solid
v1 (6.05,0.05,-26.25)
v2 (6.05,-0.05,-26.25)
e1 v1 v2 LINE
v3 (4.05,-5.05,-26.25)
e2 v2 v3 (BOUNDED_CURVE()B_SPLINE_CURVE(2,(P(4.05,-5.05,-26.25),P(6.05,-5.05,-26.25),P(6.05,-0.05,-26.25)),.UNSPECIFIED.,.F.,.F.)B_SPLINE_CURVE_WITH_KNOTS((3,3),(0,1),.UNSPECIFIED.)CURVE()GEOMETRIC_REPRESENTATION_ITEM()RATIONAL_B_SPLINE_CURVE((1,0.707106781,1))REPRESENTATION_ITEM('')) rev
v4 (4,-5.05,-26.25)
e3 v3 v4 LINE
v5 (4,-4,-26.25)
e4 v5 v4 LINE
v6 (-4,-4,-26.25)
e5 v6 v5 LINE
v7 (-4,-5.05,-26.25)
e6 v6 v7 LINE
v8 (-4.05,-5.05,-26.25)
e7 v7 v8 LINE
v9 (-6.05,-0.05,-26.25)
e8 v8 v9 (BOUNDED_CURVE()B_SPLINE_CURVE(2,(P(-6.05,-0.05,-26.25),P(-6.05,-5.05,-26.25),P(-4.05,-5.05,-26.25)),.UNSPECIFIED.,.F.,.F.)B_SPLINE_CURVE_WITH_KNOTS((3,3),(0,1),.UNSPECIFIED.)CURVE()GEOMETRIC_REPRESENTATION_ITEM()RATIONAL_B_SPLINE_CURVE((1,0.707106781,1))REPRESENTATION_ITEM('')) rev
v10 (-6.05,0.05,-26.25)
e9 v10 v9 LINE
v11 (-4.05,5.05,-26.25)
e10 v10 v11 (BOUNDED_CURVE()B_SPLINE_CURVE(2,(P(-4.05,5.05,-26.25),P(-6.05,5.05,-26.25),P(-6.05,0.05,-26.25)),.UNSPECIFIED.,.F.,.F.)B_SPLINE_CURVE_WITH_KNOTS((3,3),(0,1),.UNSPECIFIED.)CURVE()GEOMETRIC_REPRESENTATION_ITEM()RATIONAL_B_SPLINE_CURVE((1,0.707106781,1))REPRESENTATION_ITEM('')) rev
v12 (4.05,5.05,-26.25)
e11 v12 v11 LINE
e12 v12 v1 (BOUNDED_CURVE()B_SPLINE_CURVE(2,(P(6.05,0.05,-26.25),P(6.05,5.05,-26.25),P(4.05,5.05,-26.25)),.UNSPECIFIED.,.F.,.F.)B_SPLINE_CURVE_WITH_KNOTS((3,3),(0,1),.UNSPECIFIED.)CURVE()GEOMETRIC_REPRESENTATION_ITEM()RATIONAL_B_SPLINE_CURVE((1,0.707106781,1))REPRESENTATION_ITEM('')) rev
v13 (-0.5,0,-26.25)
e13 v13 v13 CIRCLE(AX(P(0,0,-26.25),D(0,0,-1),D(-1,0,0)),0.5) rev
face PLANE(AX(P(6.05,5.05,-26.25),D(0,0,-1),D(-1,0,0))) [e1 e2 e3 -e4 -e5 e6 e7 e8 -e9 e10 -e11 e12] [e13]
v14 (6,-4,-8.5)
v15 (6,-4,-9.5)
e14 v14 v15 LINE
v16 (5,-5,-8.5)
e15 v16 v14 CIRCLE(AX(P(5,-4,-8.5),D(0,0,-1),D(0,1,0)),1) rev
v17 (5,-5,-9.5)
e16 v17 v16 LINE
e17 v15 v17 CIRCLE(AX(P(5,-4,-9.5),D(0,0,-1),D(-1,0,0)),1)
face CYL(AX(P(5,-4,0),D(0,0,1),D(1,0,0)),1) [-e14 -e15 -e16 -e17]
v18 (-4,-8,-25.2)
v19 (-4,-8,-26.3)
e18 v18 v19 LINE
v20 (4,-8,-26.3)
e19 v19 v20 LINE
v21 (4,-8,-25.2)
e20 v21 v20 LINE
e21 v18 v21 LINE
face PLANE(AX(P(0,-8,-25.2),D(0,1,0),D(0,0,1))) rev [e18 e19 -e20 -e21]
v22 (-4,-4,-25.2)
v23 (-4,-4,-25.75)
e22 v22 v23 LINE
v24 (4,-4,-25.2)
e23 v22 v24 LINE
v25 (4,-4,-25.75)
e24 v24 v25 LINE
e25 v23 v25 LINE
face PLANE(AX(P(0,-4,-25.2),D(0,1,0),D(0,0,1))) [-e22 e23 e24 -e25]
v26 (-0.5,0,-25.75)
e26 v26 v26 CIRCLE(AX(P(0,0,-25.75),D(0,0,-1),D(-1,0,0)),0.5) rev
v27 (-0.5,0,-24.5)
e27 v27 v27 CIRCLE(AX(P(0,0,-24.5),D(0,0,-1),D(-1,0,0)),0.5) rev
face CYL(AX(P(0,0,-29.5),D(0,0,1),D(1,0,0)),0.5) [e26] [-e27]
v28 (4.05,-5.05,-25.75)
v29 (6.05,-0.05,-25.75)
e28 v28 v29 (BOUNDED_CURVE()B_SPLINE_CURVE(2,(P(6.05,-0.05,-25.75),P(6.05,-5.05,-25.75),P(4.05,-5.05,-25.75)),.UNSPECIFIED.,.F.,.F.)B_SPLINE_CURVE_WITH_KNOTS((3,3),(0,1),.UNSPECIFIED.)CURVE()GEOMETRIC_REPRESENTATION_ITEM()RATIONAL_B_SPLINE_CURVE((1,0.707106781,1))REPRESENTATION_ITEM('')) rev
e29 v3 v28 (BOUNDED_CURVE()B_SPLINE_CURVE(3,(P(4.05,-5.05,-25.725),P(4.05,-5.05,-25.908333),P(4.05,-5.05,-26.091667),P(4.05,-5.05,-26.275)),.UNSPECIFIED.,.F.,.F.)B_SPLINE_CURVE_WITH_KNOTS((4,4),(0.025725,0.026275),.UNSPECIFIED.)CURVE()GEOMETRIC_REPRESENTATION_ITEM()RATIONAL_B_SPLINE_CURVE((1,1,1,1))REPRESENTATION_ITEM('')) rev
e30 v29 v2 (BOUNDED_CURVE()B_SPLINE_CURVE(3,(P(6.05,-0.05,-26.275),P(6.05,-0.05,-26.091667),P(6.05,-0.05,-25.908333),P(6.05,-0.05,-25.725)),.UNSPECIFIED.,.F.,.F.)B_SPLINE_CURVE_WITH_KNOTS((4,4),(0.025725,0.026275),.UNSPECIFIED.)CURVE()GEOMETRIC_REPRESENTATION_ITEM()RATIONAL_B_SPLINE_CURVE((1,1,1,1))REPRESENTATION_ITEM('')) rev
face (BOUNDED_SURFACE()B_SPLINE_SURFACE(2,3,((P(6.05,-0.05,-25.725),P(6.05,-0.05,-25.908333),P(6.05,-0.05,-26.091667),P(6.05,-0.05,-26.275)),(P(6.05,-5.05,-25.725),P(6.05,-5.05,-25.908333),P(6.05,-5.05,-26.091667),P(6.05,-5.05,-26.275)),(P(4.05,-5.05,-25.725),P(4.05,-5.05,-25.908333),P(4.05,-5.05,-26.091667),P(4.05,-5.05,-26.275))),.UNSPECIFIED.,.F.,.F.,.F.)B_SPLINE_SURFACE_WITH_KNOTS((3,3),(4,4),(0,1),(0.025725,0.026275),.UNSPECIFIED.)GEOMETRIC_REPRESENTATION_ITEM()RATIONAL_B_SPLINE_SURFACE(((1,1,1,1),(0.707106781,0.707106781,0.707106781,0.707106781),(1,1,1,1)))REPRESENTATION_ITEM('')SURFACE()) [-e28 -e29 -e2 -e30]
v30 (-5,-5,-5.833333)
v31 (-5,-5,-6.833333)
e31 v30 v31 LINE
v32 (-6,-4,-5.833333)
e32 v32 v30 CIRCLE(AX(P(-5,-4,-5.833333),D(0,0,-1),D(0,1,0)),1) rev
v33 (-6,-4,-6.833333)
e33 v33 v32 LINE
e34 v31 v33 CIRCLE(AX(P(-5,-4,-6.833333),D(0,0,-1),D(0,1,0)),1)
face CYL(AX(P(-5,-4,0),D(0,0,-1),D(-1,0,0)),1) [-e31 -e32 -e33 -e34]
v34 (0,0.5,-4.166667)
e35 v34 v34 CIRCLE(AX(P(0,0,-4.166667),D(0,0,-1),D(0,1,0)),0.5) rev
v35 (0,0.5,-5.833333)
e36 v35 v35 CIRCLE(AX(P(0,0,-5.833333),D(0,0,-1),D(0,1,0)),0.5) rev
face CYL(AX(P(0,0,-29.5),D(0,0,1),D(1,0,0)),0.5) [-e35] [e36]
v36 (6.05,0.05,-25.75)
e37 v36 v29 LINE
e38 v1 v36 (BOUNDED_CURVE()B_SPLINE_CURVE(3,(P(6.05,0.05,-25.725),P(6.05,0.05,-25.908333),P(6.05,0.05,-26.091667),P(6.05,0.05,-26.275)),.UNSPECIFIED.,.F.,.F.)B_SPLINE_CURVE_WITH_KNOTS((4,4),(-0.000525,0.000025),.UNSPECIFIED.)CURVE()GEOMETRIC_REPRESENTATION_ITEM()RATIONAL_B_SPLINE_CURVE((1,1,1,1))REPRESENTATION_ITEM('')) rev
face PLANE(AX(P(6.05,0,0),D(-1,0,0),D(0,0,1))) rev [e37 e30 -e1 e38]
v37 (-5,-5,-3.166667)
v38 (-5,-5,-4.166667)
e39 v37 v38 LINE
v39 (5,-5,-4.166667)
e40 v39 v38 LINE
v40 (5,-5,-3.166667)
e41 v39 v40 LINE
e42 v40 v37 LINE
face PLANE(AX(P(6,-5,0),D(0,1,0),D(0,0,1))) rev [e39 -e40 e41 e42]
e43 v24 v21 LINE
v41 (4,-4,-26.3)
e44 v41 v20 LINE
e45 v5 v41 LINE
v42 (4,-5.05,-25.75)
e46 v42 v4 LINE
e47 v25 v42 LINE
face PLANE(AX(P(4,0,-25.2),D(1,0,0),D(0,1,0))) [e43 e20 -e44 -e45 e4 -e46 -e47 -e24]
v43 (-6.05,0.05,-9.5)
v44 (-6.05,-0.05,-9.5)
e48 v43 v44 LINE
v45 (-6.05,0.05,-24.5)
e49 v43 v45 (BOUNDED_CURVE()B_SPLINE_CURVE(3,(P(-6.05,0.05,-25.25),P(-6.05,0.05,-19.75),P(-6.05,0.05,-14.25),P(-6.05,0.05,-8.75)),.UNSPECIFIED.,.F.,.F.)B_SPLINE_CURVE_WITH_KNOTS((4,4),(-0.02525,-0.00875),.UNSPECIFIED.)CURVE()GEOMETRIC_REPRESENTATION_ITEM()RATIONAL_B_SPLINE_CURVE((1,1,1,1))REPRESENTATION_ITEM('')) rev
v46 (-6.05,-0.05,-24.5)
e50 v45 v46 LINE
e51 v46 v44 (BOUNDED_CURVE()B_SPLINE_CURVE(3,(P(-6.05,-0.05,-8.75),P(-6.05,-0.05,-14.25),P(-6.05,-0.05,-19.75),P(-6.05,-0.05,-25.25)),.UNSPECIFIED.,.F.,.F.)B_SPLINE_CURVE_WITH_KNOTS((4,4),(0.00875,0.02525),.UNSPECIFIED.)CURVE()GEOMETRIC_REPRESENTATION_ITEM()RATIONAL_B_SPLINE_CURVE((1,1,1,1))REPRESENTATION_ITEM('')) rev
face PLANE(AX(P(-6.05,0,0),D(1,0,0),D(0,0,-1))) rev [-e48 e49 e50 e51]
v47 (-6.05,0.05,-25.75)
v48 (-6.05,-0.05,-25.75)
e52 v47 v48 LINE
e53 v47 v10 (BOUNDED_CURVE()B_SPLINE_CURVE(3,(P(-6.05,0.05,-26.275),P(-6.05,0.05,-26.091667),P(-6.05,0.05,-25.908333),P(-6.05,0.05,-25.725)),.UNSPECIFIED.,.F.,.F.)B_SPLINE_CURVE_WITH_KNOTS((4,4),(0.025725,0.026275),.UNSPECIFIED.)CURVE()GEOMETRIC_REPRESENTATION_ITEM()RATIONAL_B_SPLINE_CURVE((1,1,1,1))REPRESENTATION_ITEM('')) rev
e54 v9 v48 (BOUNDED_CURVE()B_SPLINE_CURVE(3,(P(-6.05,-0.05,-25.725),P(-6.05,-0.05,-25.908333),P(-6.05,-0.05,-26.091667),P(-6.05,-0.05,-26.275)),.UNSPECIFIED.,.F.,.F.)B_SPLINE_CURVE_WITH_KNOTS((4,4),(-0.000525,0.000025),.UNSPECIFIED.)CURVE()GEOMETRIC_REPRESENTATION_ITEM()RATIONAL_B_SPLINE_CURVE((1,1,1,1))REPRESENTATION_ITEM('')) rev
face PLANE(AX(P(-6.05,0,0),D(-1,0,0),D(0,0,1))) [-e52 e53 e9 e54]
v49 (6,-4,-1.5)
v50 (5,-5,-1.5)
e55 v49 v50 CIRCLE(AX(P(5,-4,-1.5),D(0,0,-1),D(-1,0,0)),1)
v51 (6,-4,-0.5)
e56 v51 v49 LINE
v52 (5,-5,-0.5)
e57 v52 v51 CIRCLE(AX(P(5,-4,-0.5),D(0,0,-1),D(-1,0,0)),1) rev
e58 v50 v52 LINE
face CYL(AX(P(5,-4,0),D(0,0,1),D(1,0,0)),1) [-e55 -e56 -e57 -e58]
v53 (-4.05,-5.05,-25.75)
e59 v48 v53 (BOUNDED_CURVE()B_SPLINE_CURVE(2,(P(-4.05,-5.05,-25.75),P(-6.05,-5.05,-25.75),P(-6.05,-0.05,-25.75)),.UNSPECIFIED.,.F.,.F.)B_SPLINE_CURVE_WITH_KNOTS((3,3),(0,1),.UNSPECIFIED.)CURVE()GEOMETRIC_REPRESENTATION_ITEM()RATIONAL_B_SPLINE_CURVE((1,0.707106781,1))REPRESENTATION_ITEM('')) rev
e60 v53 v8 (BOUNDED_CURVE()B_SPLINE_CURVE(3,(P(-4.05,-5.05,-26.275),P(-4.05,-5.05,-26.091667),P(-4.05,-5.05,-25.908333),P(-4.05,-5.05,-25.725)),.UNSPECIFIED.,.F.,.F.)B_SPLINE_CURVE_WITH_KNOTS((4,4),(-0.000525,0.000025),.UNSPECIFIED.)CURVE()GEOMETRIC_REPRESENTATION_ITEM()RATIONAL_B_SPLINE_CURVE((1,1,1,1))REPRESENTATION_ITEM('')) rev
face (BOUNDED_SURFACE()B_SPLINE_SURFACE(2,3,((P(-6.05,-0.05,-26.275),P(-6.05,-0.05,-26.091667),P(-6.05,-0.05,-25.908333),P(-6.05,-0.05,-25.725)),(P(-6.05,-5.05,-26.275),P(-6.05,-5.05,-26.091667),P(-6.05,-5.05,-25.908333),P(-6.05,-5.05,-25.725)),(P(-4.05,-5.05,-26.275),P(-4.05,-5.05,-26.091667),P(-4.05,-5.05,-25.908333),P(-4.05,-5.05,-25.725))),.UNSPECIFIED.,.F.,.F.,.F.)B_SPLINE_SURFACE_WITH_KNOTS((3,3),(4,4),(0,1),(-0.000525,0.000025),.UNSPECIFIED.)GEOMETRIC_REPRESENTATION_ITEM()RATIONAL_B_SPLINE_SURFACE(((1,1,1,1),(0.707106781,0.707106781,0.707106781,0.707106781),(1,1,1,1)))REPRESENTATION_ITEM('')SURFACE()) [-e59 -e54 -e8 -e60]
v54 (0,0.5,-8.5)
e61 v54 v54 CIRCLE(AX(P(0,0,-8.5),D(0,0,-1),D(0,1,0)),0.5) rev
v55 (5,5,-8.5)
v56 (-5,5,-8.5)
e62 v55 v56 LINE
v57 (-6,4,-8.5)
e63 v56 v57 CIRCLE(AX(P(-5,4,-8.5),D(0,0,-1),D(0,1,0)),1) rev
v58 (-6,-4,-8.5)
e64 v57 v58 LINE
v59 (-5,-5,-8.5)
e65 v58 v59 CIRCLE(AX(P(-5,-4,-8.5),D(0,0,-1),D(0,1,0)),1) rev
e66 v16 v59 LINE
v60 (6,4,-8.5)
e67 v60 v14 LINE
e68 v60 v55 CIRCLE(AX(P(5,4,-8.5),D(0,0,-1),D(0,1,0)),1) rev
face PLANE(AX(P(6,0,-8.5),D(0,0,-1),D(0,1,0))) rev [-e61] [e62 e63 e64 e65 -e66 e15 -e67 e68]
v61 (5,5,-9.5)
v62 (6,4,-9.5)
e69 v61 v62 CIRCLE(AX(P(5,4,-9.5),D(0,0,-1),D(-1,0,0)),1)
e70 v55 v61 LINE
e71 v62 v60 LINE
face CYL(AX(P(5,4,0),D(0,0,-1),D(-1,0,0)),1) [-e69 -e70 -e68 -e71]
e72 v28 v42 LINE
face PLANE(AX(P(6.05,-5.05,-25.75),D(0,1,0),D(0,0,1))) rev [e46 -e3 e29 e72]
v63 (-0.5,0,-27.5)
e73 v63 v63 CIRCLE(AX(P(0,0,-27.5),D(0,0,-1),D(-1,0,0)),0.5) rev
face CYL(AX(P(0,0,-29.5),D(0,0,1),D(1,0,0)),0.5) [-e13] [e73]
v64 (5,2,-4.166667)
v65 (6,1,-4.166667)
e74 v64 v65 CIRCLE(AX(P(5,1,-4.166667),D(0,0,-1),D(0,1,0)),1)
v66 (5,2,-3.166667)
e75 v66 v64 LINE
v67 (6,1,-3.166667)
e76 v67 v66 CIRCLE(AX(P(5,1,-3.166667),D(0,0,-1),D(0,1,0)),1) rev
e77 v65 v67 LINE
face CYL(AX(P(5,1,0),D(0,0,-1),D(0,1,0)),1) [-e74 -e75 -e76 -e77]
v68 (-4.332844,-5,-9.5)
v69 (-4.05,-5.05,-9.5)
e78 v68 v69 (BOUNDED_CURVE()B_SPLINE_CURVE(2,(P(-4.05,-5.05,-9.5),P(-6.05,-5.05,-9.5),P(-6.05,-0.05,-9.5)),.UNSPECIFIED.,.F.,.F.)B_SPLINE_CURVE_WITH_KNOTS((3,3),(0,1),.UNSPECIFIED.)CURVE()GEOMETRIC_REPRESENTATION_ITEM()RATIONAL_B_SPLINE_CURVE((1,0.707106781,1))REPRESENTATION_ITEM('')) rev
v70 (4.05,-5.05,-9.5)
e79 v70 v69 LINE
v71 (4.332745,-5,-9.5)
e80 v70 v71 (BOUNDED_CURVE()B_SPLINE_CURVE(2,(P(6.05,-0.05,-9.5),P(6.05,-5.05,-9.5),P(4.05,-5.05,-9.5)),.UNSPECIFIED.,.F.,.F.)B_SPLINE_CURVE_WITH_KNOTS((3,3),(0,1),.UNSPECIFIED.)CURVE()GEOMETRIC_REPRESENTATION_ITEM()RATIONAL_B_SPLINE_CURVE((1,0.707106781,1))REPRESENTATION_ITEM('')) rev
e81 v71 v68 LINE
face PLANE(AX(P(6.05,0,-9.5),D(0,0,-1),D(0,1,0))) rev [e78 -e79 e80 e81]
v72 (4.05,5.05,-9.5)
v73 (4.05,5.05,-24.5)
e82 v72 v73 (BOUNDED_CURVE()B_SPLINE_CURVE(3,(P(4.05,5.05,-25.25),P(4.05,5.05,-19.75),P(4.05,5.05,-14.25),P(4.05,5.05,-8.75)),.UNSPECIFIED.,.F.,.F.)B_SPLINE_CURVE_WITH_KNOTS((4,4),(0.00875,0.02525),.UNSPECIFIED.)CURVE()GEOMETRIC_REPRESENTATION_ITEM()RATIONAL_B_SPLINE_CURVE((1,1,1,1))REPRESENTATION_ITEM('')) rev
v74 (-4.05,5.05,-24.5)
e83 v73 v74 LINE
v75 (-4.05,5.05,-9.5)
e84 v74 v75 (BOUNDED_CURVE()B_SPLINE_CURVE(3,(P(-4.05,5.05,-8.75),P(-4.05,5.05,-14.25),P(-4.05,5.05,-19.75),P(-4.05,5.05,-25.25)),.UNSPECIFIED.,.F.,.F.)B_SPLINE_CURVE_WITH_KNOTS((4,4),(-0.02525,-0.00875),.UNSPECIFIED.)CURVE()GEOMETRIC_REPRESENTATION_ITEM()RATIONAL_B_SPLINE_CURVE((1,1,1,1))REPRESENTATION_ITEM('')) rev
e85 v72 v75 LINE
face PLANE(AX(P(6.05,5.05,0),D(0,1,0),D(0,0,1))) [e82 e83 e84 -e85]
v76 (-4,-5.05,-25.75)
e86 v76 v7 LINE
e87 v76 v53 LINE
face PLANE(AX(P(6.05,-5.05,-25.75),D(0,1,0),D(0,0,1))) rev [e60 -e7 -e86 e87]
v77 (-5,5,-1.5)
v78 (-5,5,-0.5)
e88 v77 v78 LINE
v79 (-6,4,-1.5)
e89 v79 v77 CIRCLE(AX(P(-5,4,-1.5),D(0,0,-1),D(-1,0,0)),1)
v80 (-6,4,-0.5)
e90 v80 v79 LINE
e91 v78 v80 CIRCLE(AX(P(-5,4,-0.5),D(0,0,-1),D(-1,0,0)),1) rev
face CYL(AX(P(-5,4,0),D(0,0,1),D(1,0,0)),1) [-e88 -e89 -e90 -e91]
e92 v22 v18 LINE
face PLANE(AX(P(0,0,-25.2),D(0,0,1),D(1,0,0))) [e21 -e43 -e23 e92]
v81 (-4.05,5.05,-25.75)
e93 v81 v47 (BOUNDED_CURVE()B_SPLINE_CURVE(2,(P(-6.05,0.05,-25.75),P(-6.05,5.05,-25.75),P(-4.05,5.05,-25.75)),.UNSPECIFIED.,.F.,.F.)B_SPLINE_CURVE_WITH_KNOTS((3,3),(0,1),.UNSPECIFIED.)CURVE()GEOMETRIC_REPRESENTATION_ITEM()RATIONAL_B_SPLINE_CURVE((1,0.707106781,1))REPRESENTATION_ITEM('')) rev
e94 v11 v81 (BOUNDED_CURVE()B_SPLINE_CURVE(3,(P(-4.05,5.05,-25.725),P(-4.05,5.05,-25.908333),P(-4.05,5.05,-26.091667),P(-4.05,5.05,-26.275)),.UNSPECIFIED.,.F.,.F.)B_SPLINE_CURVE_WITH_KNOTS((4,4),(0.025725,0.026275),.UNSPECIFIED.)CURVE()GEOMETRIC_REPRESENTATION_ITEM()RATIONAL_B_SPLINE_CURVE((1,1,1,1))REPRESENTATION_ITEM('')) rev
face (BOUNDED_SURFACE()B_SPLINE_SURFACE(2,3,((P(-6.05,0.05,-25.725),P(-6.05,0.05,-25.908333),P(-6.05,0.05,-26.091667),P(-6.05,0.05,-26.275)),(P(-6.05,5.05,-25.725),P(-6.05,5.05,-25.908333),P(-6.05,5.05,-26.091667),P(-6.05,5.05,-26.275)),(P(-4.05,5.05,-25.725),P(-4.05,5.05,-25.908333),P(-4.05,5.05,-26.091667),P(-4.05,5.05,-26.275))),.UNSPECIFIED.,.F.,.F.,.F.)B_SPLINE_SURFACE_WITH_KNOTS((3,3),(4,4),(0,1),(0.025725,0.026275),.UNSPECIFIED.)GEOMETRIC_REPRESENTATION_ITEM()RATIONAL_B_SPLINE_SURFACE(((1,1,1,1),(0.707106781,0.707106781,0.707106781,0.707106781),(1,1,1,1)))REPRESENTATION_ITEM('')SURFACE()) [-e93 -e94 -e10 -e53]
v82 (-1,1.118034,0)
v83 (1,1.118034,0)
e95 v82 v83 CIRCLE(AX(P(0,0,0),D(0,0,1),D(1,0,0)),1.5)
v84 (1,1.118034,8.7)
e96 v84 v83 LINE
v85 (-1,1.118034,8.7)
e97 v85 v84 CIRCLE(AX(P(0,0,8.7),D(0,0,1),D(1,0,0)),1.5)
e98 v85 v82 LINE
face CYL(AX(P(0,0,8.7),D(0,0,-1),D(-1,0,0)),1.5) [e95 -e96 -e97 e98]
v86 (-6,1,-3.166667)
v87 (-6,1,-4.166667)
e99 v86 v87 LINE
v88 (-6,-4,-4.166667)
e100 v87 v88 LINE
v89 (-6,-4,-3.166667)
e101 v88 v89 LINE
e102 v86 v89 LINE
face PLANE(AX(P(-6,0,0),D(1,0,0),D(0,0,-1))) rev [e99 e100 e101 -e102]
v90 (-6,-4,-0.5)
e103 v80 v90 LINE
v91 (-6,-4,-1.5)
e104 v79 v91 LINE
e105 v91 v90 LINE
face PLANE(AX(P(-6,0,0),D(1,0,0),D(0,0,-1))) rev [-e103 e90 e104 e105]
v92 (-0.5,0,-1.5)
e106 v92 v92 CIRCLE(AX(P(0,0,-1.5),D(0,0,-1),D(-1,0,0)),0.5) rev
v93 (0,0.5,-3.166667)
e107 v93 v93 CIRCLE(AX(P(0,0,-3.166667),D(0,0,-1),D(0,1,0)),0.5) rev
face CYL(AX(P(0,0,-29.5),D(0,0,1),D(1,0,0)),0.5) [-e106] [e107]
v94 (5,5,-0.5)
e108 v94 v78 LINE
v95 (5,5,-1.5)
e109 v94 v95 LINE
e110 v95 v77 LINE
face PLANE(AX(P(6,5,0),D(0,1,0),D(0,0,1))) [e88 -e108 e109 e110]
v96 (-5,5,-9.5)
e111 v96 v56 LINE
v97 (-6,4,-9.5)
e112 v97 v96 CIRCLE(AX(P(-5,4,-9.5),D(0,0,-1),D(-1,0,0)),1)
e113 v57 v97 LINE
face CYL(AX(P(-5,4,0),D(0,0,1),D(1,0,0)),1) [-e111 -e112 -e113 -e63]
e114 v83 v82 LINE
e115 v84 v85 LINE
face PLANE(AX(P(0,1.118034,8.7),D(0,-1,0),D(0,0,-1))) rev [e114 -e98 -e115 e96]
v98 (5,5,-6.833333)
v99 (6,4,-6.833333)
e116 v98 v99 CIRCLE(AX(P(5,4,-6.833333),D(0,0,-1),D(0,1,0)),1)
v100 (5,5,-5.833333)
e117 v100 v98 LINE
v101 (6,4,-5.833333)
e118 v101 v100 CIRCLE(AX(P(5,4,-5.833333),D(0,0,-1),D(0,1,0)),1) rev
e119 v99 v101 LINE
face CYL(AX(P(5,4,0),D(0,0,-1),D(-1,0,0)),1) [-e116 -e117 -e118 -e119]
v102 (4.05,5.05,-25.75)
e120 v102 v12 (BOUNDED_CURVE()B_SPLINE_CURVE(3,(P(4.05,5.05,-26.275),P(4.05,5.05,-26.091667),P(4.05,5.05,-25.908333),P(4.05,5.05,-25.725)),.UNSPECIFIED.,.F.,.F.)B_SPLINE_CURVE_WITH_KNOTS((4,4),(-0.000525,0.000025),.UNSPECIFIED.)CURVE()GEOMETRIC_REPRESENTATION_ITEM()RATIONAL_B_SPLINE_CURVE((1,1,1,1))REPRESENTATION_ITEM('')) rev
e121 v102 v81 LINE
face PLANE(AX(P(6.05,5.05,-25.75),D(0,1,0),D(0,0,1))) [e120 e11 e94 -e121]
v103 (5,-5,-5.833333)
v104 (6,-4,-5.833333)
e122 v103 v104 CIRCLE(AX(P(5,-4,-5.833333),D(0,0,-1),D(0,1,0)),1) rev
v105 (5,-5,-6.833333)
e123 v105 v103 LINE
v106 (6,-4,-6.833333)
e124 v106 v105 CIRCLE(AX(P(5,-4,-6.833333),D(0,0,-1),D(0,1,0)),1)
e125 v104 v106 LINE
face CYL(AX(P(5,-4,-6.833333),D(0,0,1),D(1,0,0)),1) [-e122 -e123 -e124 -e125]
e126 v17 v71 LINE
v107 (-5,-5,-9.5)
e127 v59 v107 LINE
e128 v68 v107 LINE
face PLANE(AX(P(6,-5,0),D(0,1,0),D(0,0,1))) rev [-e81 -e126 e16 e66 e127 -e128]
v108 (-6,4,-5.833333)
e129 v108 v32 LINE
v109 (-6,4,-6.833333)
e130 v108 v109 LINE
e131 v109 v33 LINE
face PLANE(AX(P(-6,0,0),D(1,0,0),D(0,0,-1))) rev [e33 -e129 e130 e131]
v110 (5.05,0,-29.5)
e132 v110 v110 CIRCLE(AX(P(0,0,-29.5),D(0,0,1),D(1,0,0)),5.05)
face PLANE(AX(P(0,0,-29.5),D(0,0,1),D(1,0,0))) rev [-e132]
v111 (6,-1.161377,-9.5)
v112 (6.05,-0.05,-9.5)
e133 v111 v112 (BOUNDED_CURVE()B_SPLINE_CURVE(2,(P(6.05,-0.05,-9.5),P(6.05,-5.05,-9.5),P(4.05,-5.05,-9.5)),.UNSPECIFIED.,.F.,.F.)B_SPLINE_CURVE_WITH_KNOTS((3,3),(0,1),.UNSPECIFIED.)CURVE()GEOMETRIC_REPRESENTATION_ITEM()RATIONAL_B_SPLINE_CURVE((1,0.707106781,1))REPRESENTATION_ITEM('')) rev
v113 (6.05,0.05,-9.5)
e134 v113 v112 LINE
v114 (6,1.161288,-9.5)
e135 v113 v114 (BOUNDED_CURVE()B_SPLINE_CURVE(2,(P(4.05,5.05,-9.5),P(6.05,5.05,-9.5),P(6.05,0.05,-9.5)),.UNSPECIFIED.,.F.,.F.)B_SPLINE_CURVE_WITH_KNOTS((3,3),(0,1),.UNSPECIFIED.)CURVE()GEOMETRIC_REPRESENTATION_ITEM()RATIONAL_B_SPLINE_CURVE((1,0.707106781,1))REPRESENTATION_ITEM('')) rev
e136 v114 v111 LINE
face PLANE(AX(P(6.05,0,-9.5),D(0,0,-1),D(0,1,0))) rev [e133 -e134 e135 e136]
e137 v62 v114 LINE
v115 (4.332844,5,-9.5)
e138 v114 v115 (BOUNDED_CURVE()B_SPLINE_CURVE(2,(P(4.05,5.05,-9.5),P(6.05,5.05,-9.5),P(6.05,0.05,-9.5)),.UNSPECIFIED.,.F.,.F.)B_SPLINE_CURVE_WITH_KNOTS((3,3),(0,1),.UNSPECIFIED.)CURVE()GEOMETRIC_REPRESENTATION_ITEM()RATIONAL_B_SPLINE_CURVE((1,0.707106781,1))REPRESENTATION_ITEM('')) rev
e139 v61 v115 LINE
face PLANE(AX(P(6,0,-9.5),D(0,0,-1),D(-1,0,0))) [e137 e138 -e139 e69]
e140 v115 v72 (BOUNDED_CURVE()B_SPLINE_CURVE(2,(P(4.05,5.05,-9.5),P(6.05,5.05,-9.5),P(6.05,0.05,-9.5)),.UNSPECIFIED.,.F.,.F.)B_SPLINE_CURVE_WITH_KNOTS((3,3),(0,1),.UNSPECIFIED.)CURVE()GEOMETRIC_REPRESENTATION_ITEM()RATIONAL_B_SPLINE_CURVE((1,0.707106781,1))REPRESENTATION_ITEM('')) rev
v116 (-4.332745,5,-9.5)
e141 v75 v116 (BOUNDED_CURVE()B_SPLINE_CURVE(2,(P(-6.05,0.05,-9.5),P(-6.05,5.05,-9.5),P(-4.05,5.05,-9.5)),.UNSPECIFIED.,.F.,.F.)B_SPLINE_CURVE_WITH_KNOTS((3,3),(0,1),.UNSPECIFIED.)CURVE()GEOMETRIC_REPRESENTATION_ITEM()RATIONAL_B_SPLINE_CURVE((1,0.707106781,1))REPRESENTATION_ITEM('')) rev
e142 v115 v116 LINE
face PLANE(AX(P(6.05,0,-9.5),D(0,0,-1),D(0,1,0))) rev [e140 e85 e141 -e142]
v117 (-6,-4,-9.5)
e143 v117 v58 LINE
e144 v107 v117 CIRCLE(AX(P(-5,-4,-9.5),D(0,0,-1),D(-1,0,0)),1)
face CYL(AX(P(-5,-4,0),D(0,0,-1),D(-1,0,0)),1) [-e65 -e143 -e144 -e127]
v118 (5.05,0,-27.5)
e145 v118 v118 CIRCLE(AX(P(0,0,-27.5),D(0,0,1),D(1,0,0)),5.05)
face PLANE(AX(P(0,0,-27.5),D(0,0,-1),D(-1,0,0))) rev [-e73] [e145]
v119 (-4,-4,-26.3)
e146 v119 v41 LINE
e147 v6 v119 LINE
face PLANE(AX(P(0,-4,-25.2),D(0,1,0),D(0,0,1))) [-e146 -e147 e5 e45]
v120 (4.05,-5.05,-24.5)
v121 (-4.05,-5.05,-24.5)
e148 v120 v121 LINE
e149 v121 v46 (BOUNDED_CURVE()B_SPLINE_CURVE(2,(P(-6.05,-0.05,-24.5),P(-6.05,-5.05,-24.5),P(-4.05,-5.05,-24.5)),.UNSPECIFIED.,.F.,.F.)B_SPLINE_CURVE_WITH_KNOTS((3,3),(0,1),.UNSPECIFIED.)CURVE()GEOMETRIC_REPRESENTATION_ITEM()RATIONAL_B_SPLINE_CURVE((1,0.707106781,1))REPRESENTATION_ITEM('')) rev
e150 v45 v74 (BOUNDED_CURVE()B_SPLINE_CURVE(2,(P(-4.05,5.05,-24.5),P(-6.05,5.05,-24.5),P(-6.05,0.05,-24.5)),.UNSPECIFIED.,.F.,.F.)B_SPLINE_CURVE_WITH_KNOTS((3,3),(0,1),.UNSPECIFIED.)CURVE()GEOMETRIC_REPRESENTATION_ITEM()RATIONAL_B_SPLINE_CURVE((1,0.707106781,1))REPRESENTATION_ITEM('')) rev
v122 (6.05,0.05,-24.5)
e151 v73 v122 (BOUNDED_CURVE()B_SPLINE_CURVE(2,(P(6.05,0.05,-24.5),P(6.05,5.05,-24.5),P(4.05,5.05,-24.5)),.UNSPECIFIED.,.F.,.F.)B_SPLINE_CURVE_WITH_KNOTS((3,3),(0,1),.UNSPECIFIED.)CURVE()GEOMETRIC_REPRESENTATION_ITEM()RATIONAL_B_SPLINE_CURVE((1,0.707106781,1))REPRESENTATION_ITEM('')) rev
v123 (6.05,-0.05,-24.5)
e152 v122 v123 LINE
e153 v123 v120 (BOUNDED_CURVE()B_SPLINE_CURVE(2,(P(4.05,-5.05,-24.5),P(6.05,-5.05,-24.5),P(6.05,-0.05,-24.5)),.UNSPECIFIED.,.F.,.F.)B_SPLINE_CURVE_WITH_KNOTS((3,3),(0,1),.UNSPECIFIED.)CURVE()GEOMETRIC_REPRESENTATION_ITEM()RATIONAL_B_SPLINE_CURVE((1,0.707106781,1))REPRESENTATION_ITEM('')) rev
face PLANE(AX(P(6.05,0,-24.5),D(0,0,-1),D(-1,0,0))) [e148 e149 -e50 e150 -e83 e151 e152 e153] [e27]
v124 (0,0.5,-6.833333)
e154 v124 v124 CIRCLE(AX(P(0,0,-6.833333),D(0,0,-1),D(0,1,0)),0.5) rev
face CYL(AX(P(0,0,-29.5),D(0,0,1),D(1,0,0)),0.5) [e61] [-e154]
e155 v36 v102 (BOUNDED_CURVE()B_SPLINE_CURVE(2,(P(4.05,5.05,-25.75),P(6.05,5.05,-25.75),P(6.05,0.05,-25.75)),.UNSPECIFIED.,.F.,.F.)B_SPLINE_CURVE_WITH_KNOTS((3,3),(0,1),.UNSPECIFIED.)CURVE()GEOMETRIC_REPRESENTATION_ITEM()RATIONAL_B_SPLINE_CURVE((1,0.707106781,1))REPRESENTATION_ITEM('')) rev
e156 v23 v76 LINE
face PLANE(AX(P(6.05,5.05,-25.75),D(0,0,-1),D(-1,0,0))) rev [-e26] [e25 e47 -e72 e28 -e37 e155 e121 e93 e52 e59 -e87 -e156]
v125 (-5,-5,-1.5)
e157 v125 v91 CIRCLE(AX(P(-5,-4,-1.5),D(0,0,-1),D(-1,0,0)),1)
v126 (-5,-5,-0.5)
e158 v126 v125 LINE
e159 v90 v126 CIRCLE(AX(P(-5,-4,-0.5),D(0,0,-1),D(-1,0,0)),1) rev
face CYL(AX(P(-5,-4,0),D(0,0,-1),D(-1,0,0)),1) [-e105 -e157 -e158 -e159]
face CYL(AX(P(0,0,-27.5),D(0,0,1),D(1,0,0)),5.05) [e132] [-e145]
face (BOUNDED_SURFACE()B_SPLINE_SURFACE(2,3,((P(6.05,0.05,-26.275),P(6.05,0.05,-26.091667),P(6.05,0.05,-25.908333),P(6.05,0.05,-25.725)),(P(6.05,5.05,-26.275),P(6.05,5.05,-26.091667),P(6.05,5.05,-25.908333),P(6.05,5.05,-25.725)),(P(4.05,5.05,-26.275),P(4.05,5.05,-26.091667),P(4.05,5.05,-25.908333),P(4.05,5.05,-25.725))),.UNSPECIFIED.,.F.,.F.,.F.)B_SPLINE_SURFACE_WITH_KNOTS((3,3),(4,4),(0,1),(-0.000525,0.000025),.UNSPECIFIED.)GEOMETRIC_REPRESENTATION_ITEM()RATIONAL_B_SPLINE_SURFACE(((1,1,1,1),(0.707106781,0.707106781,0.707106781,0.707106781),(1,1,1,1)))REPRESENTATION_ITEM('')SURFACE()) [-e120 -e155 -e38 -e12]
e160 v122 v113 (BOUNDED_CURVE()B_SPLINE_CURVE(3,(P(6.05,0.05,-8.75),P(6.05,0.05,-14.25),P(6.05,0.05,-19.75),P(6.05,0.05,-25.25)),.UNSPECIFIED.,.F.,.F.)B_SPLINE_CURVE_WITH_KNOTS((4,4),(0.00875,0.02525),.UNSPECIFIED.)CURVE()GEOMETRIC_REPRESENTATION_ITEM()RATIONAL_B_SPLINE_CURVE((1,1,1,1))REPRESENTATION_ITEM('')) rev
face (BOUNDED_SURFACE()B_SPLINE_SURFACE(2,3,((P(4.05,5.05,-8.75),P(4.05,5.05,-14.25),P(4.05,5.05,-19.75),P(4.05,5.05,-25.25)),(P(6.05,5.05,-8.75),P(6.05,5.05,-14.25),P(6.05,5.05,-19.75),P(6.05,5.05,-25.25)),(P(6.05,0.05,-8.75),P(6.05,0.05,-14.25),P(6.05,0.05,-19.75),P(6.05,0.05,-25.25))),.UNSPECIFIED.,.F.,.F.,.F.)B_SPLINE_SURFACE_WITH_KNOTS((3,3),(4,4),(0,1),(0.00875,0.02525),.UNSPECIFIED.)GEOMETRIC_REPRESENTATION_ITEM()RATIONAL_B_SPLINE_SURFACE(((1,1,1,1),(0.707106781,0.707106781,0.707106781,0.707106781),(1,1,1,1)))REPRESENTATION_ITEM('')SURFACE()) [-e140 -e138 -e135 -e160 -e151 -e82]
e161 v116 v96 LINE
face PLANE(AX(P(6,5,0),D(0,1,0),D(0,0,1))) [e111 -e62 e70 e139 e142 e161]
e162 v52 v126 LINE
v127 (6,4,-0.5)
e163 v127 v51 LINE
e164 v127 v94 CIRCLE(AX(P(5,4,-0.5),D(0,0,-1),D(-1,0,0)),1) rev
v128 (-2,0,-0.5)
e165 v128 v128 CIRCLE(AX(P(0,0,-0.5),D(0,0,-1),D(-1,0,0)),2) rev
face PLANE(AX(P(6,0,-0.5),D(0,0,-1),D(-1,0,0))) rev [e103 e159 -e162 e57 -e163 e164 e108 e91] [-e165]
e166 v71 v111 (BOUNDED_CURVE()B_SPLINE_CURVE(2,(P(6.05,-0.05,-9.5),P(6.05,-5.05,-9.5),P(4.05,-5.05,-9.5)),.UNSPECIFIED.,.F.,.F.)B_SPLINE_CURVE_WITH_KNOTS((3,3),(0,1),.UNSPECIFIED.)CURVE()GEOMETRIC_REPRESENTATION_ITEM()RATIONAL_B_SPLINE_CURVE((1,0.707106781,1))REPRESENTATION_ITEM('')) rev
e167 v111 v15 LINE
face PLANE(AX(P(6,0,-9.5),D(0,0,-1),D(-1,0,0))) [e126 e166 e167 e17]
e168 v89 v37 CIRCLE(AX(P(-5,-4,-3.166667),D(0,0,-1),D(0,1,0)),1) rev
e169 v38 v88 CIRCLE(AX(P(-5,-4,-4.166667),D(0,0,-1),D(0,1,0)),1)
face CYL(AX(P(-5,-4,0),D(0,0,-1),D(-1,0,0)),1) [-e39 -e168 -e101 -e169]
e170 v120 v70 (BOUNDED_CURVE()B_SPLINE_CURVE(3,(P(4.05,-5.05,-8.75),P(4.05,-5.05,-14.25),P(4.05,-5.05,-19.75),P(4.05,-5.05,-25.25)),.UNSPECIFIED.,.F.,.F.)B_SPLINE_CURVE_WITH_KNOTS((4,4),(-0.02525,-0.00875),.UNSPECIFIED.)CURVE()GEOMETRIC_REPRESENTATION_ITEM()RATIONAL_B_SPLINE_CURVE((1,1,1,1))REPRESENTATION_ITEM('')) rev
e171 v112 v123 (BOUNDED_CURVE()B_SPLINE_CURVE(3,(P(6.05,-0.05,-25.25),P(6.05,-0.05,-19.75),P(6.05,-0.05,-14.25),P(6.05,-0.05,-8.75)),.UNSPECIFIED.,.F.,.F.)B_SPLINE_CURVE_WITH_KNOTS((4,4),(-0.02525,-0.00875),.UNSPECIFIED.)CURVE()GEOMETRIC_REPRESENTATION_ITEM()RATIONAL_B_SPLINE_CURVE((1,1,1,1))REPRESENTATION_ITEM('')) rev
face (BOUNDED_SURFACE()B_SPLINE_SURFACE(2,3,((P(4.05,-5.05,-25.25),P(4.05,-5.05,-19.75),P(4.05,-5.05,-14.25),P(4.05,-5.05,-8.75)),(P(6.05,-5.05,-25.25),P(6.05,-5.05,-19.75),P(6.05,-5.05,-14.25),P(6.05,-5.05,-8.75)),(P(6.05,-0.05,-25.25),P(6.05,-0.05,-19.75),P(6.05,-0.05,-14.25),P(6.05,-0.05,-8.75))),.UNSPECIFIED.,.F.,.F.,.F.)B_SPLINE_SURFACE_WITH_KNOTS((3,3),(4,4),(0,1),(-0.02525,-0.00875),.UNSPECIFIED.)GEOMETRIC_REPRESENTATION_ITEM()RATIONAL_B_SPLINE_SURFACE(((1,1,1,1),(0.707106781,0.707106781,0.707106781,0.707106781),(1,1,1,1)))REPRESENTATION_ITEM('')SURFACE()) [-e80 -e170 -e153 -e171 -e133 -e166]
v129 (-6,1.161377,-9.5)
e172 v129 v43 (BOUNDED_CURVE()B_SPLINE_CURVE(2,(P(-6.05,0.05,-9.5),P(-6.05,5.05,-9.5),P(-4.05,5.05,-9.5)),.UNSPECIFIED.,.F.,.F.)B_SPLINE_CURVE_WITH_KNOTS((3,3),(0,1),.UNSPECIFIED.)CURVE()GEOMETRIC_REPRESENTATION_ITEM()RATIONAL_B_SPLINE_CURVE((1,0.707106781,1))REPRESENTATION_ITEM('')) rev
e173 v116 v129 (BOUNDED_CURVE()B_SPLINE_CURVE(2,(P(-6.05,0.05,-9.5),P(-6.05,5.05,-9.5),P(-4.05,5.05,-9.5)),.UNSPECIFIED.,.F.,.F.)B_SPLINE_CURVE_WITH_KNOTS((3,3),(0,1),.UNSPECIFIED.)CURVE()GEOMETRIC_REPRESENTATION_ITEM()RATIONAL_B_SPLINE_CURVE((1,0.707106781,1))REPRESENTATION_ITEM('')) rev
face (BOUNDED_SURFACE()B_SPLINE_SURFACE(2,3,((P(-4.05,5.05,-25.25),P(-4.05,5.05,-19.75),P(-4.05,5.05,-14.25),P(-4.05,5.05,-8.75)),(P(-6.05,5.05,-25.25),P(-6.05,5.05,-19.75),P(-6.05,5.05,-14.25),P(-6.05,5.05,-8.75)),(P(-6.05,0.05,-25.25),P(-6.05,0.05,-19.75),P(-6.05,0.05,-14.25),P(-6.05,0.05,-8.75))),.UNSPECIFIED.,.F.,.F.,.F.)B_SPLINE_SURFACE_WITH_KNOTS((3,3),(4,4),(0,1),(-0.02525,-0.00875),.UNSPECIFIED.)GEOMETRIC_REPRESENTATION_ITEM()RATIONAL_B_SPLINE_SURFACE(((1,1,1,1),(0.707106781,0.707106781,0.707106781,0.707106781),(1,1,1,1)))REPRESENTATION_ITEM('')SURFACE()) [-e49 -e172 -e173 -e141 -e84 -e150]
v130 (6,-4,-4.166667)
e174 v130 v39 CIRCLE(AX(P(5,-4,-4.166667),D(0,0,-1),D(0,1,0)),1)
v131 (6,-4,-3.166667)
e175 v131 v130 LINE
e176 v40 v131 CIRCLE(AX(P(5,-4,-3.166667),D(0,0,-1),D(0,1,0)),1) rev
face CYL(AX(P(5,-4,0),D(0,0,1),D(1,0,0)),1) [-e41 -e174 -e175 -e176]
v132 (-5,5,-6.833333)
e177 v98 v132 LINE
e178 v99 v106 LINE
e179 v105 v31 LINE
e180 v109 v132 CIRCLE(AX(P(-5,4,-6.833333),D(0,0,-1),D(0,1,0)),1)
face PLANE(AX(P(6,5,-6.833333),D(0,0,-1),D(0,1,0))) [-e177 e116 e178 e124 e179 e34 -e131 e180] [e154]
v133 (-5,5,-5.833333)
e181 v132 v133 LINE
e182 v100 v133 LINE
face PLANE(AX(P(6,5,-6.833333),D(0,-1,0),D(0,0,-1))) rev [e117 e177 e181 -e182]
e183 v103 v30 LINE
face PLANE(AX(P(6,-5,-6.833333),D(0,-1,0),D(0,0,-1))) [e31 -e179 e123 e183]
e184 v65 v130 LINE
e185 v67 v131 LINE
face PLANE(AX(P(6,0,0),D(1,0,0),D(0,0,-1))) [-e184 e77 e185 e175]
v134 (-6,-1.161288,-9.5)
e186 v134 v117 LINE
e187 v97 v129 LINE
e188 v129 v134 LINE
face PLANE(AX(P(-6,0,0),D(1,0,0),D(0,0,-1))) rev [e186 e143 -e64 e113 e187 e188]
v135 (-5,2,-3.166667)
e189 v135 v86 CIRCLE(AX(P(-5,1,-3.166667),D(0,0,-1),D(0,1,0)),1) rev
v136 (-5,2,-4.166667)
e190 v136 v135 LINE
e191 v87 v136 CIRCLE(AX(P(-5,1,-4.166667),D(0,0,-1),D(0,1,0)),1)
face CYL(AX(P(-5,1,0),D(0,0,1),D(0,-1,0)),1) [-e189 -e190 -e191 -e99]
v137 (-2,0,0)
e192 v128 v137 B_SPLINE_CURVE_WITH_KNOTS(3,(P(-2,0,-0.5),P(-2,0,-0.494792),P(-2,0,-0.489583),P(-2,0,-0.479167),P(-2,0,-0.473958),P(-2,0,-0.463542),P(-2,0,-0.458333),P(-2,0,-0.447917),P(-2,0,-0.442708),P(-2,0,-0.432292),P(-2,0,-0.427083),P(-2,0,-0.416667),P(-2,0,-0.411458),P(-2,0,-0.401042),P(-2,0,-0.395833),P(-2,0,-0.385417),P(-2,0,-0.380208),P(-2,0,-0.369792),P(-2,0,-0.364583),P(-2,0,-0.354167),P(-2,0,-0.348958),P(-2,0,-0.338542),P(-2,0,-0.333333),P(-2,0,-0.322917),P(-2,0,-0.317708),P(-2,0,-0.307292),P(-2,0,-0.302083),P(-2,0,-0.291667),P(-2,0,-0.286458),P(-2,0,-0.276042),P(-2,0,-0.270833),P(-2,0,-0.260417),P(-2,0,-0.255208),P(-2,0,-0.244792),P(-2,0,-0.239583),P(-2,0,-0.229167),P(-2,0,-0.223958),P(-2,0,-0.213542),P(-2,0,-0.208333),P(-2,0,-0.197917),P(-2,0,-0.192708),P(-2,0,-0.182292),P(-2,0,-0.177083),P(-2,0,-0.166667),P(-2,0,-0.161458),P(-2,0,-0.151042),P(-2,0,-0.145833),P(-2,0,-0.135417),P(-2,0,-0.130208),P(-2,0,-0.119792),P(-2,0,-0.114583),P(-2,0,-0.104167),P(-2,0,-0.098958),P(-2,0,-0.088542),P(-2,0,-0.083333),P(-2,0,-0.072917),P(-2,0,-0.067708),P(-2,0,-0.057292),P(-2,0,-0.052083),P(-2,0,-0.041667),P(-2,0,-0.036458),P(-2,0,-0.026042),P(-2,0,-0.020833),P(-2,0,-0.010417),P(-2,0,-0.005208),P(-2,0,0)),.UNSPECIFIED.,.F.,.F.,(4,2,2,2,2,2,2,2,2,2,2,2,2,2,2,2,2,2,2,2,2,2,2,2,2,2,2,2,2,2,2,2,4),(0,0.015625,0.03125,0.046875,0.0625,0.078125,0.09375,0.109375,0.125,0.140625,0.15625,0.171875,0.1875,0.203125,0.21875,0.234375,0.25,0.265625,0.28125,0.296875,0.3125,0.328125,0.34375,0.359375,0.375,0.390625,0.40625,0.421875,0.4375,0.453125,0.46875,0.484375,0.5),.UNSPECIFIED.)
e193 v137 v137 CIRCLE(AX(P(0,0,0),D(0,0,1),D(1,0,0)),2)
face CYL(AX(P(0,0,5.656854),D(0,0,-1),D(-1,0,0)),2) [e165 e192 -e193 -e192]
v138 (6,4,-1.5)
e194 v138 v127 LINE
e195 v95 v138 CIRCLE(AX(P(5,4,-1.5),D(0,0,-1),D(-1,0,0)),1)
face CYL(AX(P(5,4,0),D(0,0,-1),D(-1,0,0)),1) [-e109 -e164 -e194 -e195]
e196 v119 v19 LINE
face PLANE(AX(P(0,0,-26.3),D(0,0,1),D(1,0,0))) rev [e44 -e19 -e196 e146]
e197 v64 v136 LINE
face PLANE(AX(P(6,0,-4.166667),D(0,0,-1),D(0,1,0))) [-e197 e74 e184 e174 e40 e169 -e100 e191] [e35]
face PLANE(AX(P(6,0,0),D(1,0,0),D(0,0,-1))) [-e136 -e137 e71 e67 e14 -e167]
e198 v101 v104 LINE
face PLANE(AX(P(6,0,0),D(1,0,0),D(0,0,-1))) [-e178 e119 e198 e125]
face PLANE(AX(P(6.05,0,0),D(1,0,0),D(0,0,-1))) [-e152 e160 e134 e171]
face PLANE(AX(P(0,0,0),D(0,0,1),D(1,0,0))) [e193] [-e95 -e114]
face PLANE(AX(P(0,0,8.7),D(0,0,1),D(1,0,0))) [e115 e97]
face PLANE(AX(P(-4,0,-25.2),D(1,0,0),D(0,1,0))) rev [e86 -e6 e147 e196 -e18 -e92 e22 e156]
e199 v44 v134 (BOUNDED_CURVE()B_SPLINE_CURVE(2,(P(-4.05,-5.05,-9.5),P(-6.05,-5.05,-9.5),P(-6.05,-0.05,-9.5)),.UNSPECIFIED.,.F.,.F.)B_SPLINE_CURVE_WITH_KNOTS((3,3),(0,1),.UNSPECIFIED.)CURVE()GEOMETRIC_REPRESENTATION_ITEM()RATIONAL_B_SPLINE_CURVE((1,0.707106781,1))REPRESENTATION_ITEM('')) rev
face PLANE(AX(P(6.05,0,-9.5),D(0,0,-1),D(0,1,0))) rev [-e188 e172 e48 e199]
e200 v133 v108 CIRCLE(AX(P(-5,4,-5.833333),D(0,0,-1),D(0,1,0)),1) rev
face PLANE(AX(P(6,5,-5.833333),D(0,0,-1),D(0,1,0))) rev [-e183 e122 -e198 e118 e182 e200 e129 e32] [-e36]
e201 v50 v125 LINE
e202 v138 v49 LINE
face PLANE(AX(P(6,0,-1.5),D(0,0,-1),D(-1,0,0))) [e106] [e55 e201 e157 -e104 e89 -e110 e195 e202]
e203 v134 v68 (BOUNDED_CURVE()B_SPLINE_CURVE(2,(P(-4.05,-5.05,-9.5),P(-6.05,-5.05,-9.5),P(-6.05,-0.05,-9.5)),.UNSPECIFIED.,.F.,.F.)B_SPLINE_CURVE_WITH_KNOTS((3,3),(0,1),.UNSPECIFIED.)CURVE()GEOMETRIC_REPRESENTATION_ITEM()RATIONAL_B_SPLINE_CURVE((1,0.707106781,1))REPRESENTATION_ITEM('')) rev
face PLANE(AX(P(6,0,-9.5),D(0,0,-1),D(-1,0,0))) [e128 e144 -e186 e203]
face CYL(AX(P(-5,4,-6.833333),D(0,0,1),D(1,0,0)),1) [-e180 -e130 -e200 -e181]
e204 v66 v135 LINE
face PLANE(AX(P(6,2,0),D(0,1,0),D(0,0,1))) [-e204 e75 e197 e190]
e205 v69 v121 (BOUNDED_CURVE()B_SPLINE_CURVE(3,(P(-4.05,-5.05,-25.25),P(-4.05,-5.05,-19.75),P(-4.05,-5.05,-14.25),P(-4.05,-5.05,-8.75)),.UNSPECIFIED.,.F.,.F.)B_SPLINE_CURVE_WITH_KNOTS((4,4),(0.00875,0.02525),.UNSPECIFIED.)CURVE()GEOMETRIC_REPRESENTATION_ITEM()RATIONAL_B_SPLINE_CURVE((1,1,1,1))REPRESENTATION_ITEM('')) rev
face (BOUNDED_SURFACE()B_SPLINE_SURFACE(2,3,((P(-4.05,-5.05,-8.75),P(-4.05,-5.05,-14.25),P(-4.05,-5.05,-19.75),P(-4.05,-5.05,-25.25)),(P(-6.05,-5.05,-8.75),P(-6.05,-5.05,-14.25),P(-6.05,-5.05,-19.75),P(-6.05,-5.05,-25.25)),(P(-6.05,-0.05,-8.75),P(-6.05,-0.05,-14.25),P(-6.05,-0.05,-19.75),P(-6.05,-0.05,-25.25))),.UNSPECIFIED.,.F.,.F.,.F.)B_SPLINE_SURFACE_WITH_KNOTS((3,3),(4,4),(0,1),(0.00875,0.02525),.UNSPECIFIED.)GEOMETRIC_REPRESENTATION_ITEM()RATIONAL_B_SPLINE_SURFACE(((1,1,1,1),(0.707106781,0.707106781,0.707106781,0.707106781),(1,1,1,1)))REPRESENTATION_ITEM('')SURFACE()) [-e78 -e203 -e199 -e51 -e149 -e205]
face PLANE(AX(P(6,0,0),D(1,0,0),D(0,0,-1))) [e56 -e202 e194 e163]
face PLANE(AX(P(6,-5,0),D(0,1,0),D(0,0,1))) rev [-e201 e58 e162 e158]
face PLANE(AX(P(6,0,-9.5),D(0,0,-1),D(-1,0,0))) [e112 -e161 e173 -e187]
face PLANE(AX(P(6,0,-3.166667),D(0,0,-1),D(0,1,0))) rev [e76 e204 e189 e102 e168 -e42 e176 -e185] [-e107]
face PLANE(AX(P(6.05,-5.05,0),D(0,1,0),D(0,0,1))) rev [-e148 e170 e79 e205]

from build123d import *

# Parameters (mm, degrees)
BOSS_EXTRUDE1_DEPTH = 8.7
BOSS_EXTRUDE3_START = 8.7
SKETCH1_3_R         = 0.5
BOSS_EXTRUDE3_DEPTH = 38.2
SKETCH2_3_W         = 0.5
SKETCH2_3_H         = 10.1
BOSS_EXTRUDE4_DEPTH = 6.05
FILLET2_SIZE        = 5
FILLET2_SIZE_2      = 2
SKETCH2_W           = 1
SKETCH2_H           = 10
SKETCH2_H_2         = 7
BOSS_EXTRUDE2_DEPTH = 6
FILLET1_R           = 1
SKETCH2_5_W         = 2
SKETCH2_5_H         = 5.05
SKETCH3_R           = 2
BOSS_EXTRUDE5_DEPTH = 0.5
SKETCH4_W           = 8
SKETCH4_H           = 2.95
SKETCH4_H_2         = 1.05
BOSS_EXTRUDE6_DEPTH = 0.55


with BuildPart() as part:
    # Sketch1 → Boss-Extrude1 (new body)
    with BuildSketch(Plane.XY):
        with BuildLine():
            Line((1, 1.118033989), (-1, 1.118033989))
            ThreePointArc((-1, 1.118033989), (0, -1.5), (1, 1.118033989))
        make_face()
    extrude(amount=BOSS_EXTRUDE1_DEPTH)

    # Sketch1<3> → Boss-Extrude3 (add)
    with BuildSketch(Plane.XY.offset(BOSS_EXTRUDE3_START)):
        Circle(SKETCH1_3_R)
    extrude(amount=-BOSS_EXTRUDE3_DEPTH)

    # Sketch2<3> → Boss-Extrude4 (add, symmetric)
    with BuildSketch(Plane(origin=(0, 0, 0), x_dir=(0, 0, -1), z_dir=(1, 0, 0))):
        Polygon((9.5, 5.05), (9.5, 5), (9.5, -5), (9.5, -5.05), (24.5, -5.05), (24.5, 0), (24.5, 5.05), align=None)
        with Locations((26, 0)):
            Rectangle(SKETCH2_3_W, SKETCH2_3_H)
    extrude(amount=BOSS_EXTRUDE4_DEPTH, both=True)

    # Fillet2
    # an asymmetric fillet: 5, 2 mm, written as the material it takes off along each edge
    with BuildSketch(Plane(origin=(-6.05, -5.05, 3), x_dir=(0, 1, 0), z_dir=(0, 0, -1)), Plane(origin=(-6.05, 5.05, -37), x_dir=(0, -1, 0), z_dir=(0, 0, 1))) as fillet2_piece_1:
        with BuildLine():
            Bezier((FILLET2_SIZE, 0), (0, 0), (0, FILLET2_SIZE_2), weights=[1, 0.707106781, 1])
            Line((0, FILLET2_SIZE_2), (0, 0))
            Line((0, 0), (FILLET2_SIZE, 0))
        make_face()
    extrude(amount=40, mode=Mode.SUBTRACT)
    with BuildSketch(Plane(origin=(6.05, -5.05, 3), x_dir=(-1, 0, 0), z_dir=(0, 0, -1)), Plane(origin=(6.05, 5.05, -37), x_dir=(-1, 0, 0), z_dir=(0, 0, 1))) as fillet2_piece_2:
        with BuildLine():
            Bezier((FILLET2_SIZE_2, 0), (0, 0), (0, FILLET2_SIZE), weights=[1, 0.707106781, 1])
            Line((0, FILLET2_SIZE), (0, 0))
            Line((0, 0), (FILLET2_SIZE_2, 0))
        make_face()
    extrude(amount=40, mode=Mode.SUBTRACT)
    with BuildSketch(Plane(origin=(-6.05, -5.05, -13.25), x_dir=(0, 1, 0), z_dir=(0, 0, -1)), Plane(origin=(-6.05, 5.05, -38.75), x_dir=(0, -1, 0), z_dir=(0, 0, 1))) as fillet2_piece_3:
        with BuildLine():
            Bezier((FILLET2_SIZE, 0), (0, 0), (0, FILLET2_SIZE_2), weights=[1, 0.707106781, 1])
            Line((0, FILLET2_SIZE_2), (0, 0))
            Line((0, 0), (FILLET2_SIZE, 0))
        make_face()
    extrude(amount=25.5, mode=Mode.SUBTRACT)
    with BuildSketch(Plane(origin=(6.05, -5.05, -13.25), x_dir=(-1, 0, 0), z_dir=(0, 0, -1)), Plane(origin=(6.05, 5.05, -38.75), x_dir=(-1, 0, 0), z_dir=(0, 0, 1))) as fillet2_piece_4:
        with BuildLine():
            Bezier((FILLET2_SIZE_2, 0), (0, 0), (0, FILLET2_SIZE), weights=[1, 0.707106781, 1])
            Line((0, FILLET2_SIZE), (0, 0))
            Line((0, 0), (FILLET2_SIZE_2, 0))
        make_face()
    extrude(amount=25.5, mode=Mode.SUBTRACT)

    # Sketch2 → Boss-Extrude2 (add, symmetric)
    with BuildSketch(Plane(origin=(0, 0, 0), x_dir=(0, 0, -1), z_dir=(1, 0, 0))):
        with Locations((1, 0)):
            Rectangle(SKETCH2_W, SKETCH2_H)
        with Locations((3.666666667, -1.5)):
            Rectangle(SKETCH2_W, SKETCH2_H_2)
        with Locations((9, 0)):
            Rectangle(SKETCH2_W, SKETCH2_H)
        with Locations((6.333333333, 0)):
            Rectangle(SKETCH2_W, SKETCH2_H)
    extrude(amount=BOSS_EXTRUDE2_DEPTH, both=True)

    # Fillet1
    fillet1_edges = [part.edges().sort_by_distance(p)[0] for p in [
        (-6, 5, -1),
        (6, 5, -1),
        (-6, -5, -1),
        (-6, -5, -3.666666667),
        (-6, -5, -6.333333333),
        (-6, -5, -9),
        (-6, 5, -9),
        (-6, 5, -6.333333333),
        (-6, 2, -3.666666667),
        (6, 5, -9),
        (6, 5, -6.333333333),
        (6, 2, -3.666666667),
        (6, -5, -9),
        (6, -5, -6.333333333),
        (6, -5, -3.666666667),
        (6, -5, -1),
    ]]
    fillet(fillet1_edges, radius=FILLET1_R)

    # Sketch2<5> → Revolve1 (revolve)
    with BuildSketch(Plane(origin=(0, 0, 0), x_dir=(0, 0, -1), z_dir=(1, 0, 0))):
        with Locations((28.5, 2.525)):
            Rectangle(SKETCH2_5_W, SKETCH2_5_H)
    revolve(axis=Axis((0, 0, -27.5), (0, 0, -1)))

    # Sketch3 → Boss-Extrude5 (add)
    with BuildSketch(Plane.XY.offset(-0.5)):
        with Locations(Location((0, 0, 0), (0, 0, 180))):
            Circle(SKETCH3_R)
    extrude(amount=BOSS_EXTRUDE5_DEPTH)

    # Sketch4 → Boss-Extrude6 (add, symmetric)
    with BuildSketch(Plane.XY.offset(-25.75)):
        with Locations((0, -6.525)):
            Rectangle(SKETCH4_W, SKETCH4_H)
        with Locations((0, -4.525)):
            Rectangle(SKETCH4_W, SKETCH4_H_2)
    extrude(amount=BOSS_EXTRUDE6_DEPTH, both=True)


solid = part.part
